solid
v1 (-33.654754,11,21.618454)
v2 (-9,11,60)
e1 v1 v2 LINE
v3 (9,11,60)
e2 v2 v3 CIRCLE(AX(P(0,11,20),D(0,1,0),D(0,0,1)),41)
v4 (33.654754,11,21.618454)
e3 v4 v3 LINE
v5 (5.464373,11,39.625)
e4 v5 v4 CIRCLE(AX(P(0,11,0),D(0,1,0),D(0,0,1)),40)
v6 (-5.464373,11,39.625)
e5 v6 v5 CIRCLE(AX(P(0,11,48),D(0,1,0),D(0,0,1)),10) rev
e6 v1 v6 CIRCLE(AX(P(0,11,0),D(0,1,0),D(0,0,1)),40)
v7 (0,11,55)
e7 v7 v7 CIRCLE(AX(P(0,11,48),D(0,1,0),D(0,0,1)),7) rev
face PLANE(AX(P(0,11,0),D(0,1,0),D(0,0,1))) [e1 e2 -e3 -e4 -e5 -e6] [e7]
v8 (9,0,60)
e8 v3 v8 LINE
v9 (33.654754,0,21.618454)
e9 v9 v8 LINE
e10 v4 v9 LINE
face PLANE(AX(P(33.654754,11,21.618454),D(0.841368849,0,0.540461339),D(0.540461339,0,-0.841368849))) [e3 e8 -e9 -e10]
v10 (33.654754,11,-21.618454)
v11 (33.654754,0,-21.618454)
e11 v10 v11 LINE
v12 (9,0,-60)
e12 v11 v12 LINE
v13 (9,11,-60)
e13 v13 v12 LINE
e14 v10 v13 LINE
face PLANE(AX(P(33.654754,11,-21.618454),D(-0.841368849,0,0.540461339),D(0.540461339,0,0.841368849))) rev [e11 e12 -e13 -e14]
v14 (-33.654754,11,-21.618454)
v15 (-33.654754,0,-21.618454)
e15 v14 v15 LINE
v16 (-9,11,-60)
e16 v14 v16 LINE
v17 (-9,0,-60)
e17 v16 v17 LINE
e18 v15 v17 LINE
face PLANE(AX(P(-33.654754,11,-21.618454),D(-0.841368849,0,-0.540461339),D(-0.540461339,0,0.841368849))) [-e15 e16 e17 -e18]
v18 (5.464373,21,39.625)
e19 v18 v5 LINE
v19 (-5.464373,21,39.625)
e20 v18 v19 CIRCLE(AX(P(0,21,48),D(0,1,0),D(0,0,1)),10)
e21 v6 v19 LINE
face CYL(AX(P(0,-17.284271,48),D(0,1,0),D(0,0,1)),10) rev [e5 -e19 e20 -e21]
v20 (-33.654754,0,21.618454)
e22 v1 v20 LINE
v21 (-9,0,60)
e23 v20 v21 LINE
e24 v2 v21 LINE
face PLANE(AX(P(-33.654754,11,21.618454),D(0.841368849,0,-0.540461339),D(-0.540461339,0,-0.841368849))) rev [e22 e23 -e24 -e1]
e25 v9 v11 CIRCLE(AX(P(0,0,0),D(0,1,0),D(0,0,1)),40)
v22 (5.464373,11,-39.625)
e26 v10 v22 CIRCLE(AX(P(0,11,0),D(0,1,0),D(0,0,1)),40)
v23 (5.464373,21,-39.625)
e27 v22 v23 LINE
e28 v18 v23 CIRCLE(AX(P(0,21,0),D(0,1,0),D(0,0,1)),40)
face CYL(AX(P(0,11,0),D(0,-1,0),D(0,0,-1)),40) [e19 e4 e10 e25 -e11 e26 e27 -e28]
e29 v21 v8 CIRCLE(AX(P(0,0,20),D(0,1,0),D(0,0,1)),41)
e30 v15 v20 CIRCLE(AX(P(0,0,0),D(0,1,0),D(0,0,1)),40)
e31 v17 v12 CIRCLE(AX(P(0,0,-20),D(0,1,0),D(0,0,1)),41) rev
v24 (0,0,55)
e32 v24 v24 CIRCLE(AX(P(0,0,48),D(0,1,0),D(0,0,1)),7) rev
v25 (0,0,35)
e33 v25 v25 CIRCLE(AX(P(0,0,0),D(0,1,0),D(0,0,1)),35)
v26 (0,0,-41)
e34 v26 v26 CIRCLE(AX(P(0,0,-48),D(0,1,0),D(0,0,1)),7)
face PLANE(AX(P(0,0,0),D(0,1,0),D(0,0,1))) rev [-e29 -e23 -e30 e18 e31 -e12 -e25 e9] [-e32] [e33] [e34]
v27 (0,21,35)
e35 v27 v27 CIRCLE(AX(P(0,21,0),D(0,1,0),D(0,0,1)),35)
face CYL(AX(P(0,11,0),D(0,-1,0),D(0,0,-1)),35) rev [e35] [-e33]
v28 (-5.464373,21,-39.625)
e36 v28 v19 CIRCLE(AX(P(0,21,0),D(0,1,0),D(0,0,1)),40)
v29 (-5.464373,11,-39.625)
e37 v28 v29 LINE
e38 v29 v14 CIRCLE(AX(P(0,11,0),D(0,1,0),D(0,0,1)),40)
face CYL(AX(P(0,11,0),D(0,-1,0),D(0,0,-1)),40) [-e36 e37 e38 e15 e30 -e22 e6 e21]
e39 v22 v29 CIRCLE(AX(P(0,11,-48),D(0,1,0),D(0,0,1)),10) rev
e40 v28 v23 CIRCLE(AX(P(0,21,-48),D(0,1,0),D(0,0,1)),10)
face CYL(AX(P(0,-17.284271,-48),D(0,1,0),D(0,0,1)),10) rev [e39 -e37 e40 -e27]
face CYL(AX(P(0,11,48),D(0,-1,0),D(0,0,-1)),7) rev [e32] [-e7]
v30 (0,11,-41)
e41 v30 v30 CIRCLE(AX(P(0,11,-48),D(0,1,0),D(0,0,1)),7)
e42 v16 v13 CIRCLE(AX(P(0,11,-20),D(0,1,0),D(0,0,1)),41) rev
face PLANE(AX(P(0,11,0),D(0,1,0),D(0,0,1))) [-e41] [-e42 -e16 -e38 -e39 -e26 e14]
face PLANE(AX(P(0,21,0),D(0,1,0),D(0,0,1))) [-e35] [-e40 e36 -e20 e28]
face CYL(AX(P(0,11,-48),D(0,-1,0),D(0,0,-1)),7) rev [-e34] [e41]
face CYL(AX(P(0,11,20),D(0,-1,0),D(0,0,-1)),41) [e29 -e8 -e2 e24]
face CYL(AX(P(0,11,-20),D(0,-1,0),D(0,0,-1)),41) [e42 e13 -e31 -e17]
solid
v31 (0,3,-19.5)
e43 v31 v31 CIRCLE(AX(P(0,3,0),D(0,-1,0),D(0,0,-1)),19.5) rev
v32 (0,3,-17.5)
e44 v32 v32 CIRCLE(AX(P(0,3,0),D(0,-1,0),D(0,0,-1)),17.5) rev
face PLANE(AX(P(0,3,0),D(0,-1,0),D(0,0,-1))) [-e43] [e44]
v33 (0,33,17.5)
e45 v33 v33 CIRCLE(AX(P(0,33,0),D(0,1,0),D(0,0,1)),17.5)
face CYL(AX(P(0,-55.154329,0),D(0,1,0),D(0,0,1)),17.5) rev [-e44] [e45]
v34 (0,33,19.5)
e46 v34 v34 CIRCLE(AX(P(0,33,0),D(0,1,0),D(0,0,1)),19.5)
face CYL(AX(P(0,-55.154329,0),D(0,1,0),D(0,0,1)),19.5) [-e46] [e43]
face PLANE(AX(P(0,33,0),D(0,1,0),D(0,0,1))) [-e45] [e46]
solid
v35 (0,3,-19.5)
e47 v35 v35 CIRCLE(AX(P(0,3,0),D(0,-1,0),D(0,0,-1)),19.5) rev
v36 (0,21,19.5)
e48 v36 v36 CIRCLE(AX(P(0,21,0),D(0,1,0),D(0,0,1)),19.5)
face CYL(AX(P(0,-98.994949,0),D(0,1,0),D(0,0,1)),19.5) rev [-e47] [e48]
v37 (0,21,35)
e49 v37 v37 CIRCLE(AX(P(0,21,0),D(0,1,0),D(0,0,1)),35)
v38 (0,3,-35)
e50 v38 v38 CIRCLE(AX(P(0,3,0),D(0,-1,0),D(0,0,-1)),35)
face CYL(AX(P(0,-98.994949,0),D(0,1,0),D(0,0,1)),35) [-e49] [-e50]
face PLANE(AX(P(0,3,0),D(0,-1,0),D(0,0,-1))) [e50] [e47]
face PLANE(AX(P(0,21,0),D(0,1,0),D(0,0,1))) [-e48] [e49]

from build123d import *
from build123d.topology import SkipClean

# Parameters (mm, degrees)
SKETCH1_R                = 7
SKETCH1_R_2              = 35
BOSS_EXTRUDE1_DEPTH      = 11
SKETCH2_R                = 40
SKETCH2_R_2              = 35
BOSS_EXTRUDE2_DEPTH      = 10
CUT_EXTRUDE1_START       = -10
CUT_EXTRUDE1_DEPTH       = 10
SKETCH4_R                = 35
SKETCH4_R_2              = 19.5
BOSS_EXTRUDE3_DEPTH      = 21
BOSS_EXTRUDE4_DEPTH      = 12
BOSS_EXTRUDE4_DEPTH_BACK = 21
SKETCH5_R                = 19.5
SKETCH5_R_2              = 17.5
SKETCH6_R                = 35
CUT_EXTRUDE2_DEPTH       = 3


# Read off the part's stored shape, not the designer's step: Cut-Extrude1
with BuildPart() as part:
    # Sketch1 → Boss-Extrude1 (new body)
    # profile 1 of 3: a face of its own
    with BuildSketch(Plane(origin=(0, 0, 0), x_dir=(1, 0, 0), z_dir=(0, 1, 0))):
        with BuildLine():
            Line((-9, 60), (-33.654753977, 21.61845357))
            ThreePointArc((-33.654753977, 21.61845357), (-21.532195831, 33.710006566), (-5.464373249, 39.625))
            ThreePointArc((-5.464373249, 39.625), (0, 38), (5.464373249, 39.625))
            ThreePointArc((5.464373249, 39.625), (21.532195831, 33.710006566), (33.654753977, 21.61845357))
            Line((33.654753977, 21.61845357), (9, 60))
            ThreePointArc((9, 60), (0, 61), (-9, 60))
        make_face()
        with Locations(Location((0, 48, 0), (0, 0, 270))):
            Circle(SKETCH1_R, mode=Mode.SUBTRACT)
    # profile 2 of 3: a face of its own
    with BuildSketch(Plane(origin=(0, 0, 0), x_dir=(1, 0, 0), z_dir=(0, 1, 0))):
        with BuildLine():
            ThreePointArc((-5.464373249, -39.625), (0, -38), (5.464373249, -39.625))
            ThreePointArc((5.464373249, -39.625), (40, 0), (5.464373249, 39.625))
            ThreePointArc((5.464373249, 39.625), (0, 38), (-5.464373249, 39.625))
            ThreePointArc((-5.464373249, 39.625), (-40, 0), (-5.464373249, -39.625))
        make_face()
        with Locations(Location((0, 0, 0), (0, 0, 270))):
            Circle(SKETCH1_R_2, mode=Mode.SUBTRACT)
    # profile 3 of 3: a face of its own
    with BuildSketch(Plane(origin=(0, 0, 0), x_dir=(1, 0, 0), z_dir=(0, 1, 0))):
        with BuildLine():
            ThreePointArc((-5.464373249, -39.625), (-21.532195831, -33.710006566), (-33.654753977, -21.61845357))
            Line((-33.654753977, -21.61845357), (-9, -60))
            ThreePointArc((-9, -60), (0, -61), (9, -60))
            Line((9, -60), (33.654753977, -21.61845357))
            ThreePointArc((33.654753977, -21.61845357), (21.532195831, -33.710006566), (5.464373249, -39.625))
            ThreePointArc((5.464373249, -39.625), (0, -38), (-5.464373249, -39.625))
        make_face()
        with Locations(Location((0, -48, 0), (0, 0, 270))):
            Circle(SKETCH1_R, mode=Mode.SUBTRACT)
    extrude(amount=BOSS_EXTRUDE1_DEPTH)

    # Sketch2 → Boss-Extrude2 (add)
    with BuildSketch(Plane(origin=(0, 11, 0), x_dir=(1, 0, 0), z_dir=(0, 1, 0))):
        with Locations(Location((0, 0, 0), (0, 0, 32.715049731))):
            Circle(SKETCH2_R)
        with Locations(Location((0, 0, 0), (0, 0, 270))):
            Circle(SKETCH2_R_2, mode=Mode.SUBTRACT)
    extrude(amount=BOSS_EXTRUDE2_DEPTH)

    # Cut-Extrude1 outline → Cut-Extrude1 (cut)
    with SkipClean():  # the faces are left unmerged after this step: merging them gives an invalid solid
        with BuildSketch(Plane(origin=(0, 21, 0), x_dir=(1, 0, 0), z_dir=(0, 1, 0)).offset(CUT_EXTRUDE1_START)):
            with BuildLine():
                ThreePointArc((-5.464373249, -39.625), (0, -40), (5.464373249, -39.625))
                ThreePointArc((5.464373249, -39.625), (0, -38), (-5.464373249, -39.625))
            make_face()
            with BuildLine():
                ThreePointArc((5.464373249, 39.625), (0, 40), (-5.464373249, 39.625))
                ThreePointArc((-5.464373249, 39.625), (0, 38), (5.464373249, 39.625))
            make_face()
        extrude(amount=CUT_EXTRUDE1_DEPTH, mode=Mode.SUBTRACT)


with BuildPart() as body_2:
    # Sketch4 → Boss-Extrude3 (new body)
    with BuildSketch(Plane(origin=(0, 21, 0), x_dir=(1, 0, 0), z_dir=(0, 1, 0))):
        with Locations(Location((0, 0, 0), (0, 0, 270))):
            Circle(SKETCH4_R)
        with Locations(Location((0, 0, 0), (0, 0, 270))):
            Circle(SKETCH4_R_2, mode=Mode.SUBTRACT)
    extrude(amount=-BOSS_EXTRUDE3_DEPTH)


with BuildPart() as body_3:
    # Sketch5 → Boss-Extrude4 (new, two sides: drawn at the far end of the back side and taken through both)
    with BuildSketch(Plane(origin=(0, 21, 0), x_dir=(1, 0, 0), z_dir=(0, 1, 0)).offset(-BOSS_EXTRUDE4_DEPTH_BACK)):
        with Locations(Location((0, 0, 0), (0, 0, 270))):
            Circle(SKETCH5_R)
        with Locations(Location((0, 0, 0), (0, 0, 270))):
            Circle(SKETCH5_R_2, mode=Mode.SUBTRACT)
    extrude(amount=BOSS_EXTRUDE4_DEPTH + BOSS_EXTRUDE4_DEPTH_BACK)


with BuildPart() as cut_extrude2_tool:
    # Sketch6 → Cut-Extrude2 (new body)
    with BuildSketch(Plane(origin=(0, 0, 0), x_dir=(-1, 0, 0), z_dir=(0, -1, 0))):
        with Locations(Location((0, 0, 0), (0, 0, 270))):
            Circle(SKETCH6_R)
    extrude(amount=-CUT_EXTRUDE2_DEPTH)


with BuildPart() as body_2_1:
    add(body_2.part)

    # Cut-Extrude2: cut by cut_extrude2_tool
    add(cut_extrude2_tool.part, mode=Mode.SUBTRACT)


with BuildPart() as body_3_1:
    add(body_3.part)

    # Cut-Extrude2: cut by cut_extrude2_tool
    add(cut_extrude2_tool.part, mode=Mode.SUBTRACT)


solid = Compound([part.part, body_2_1.part, body_3_1.part])
